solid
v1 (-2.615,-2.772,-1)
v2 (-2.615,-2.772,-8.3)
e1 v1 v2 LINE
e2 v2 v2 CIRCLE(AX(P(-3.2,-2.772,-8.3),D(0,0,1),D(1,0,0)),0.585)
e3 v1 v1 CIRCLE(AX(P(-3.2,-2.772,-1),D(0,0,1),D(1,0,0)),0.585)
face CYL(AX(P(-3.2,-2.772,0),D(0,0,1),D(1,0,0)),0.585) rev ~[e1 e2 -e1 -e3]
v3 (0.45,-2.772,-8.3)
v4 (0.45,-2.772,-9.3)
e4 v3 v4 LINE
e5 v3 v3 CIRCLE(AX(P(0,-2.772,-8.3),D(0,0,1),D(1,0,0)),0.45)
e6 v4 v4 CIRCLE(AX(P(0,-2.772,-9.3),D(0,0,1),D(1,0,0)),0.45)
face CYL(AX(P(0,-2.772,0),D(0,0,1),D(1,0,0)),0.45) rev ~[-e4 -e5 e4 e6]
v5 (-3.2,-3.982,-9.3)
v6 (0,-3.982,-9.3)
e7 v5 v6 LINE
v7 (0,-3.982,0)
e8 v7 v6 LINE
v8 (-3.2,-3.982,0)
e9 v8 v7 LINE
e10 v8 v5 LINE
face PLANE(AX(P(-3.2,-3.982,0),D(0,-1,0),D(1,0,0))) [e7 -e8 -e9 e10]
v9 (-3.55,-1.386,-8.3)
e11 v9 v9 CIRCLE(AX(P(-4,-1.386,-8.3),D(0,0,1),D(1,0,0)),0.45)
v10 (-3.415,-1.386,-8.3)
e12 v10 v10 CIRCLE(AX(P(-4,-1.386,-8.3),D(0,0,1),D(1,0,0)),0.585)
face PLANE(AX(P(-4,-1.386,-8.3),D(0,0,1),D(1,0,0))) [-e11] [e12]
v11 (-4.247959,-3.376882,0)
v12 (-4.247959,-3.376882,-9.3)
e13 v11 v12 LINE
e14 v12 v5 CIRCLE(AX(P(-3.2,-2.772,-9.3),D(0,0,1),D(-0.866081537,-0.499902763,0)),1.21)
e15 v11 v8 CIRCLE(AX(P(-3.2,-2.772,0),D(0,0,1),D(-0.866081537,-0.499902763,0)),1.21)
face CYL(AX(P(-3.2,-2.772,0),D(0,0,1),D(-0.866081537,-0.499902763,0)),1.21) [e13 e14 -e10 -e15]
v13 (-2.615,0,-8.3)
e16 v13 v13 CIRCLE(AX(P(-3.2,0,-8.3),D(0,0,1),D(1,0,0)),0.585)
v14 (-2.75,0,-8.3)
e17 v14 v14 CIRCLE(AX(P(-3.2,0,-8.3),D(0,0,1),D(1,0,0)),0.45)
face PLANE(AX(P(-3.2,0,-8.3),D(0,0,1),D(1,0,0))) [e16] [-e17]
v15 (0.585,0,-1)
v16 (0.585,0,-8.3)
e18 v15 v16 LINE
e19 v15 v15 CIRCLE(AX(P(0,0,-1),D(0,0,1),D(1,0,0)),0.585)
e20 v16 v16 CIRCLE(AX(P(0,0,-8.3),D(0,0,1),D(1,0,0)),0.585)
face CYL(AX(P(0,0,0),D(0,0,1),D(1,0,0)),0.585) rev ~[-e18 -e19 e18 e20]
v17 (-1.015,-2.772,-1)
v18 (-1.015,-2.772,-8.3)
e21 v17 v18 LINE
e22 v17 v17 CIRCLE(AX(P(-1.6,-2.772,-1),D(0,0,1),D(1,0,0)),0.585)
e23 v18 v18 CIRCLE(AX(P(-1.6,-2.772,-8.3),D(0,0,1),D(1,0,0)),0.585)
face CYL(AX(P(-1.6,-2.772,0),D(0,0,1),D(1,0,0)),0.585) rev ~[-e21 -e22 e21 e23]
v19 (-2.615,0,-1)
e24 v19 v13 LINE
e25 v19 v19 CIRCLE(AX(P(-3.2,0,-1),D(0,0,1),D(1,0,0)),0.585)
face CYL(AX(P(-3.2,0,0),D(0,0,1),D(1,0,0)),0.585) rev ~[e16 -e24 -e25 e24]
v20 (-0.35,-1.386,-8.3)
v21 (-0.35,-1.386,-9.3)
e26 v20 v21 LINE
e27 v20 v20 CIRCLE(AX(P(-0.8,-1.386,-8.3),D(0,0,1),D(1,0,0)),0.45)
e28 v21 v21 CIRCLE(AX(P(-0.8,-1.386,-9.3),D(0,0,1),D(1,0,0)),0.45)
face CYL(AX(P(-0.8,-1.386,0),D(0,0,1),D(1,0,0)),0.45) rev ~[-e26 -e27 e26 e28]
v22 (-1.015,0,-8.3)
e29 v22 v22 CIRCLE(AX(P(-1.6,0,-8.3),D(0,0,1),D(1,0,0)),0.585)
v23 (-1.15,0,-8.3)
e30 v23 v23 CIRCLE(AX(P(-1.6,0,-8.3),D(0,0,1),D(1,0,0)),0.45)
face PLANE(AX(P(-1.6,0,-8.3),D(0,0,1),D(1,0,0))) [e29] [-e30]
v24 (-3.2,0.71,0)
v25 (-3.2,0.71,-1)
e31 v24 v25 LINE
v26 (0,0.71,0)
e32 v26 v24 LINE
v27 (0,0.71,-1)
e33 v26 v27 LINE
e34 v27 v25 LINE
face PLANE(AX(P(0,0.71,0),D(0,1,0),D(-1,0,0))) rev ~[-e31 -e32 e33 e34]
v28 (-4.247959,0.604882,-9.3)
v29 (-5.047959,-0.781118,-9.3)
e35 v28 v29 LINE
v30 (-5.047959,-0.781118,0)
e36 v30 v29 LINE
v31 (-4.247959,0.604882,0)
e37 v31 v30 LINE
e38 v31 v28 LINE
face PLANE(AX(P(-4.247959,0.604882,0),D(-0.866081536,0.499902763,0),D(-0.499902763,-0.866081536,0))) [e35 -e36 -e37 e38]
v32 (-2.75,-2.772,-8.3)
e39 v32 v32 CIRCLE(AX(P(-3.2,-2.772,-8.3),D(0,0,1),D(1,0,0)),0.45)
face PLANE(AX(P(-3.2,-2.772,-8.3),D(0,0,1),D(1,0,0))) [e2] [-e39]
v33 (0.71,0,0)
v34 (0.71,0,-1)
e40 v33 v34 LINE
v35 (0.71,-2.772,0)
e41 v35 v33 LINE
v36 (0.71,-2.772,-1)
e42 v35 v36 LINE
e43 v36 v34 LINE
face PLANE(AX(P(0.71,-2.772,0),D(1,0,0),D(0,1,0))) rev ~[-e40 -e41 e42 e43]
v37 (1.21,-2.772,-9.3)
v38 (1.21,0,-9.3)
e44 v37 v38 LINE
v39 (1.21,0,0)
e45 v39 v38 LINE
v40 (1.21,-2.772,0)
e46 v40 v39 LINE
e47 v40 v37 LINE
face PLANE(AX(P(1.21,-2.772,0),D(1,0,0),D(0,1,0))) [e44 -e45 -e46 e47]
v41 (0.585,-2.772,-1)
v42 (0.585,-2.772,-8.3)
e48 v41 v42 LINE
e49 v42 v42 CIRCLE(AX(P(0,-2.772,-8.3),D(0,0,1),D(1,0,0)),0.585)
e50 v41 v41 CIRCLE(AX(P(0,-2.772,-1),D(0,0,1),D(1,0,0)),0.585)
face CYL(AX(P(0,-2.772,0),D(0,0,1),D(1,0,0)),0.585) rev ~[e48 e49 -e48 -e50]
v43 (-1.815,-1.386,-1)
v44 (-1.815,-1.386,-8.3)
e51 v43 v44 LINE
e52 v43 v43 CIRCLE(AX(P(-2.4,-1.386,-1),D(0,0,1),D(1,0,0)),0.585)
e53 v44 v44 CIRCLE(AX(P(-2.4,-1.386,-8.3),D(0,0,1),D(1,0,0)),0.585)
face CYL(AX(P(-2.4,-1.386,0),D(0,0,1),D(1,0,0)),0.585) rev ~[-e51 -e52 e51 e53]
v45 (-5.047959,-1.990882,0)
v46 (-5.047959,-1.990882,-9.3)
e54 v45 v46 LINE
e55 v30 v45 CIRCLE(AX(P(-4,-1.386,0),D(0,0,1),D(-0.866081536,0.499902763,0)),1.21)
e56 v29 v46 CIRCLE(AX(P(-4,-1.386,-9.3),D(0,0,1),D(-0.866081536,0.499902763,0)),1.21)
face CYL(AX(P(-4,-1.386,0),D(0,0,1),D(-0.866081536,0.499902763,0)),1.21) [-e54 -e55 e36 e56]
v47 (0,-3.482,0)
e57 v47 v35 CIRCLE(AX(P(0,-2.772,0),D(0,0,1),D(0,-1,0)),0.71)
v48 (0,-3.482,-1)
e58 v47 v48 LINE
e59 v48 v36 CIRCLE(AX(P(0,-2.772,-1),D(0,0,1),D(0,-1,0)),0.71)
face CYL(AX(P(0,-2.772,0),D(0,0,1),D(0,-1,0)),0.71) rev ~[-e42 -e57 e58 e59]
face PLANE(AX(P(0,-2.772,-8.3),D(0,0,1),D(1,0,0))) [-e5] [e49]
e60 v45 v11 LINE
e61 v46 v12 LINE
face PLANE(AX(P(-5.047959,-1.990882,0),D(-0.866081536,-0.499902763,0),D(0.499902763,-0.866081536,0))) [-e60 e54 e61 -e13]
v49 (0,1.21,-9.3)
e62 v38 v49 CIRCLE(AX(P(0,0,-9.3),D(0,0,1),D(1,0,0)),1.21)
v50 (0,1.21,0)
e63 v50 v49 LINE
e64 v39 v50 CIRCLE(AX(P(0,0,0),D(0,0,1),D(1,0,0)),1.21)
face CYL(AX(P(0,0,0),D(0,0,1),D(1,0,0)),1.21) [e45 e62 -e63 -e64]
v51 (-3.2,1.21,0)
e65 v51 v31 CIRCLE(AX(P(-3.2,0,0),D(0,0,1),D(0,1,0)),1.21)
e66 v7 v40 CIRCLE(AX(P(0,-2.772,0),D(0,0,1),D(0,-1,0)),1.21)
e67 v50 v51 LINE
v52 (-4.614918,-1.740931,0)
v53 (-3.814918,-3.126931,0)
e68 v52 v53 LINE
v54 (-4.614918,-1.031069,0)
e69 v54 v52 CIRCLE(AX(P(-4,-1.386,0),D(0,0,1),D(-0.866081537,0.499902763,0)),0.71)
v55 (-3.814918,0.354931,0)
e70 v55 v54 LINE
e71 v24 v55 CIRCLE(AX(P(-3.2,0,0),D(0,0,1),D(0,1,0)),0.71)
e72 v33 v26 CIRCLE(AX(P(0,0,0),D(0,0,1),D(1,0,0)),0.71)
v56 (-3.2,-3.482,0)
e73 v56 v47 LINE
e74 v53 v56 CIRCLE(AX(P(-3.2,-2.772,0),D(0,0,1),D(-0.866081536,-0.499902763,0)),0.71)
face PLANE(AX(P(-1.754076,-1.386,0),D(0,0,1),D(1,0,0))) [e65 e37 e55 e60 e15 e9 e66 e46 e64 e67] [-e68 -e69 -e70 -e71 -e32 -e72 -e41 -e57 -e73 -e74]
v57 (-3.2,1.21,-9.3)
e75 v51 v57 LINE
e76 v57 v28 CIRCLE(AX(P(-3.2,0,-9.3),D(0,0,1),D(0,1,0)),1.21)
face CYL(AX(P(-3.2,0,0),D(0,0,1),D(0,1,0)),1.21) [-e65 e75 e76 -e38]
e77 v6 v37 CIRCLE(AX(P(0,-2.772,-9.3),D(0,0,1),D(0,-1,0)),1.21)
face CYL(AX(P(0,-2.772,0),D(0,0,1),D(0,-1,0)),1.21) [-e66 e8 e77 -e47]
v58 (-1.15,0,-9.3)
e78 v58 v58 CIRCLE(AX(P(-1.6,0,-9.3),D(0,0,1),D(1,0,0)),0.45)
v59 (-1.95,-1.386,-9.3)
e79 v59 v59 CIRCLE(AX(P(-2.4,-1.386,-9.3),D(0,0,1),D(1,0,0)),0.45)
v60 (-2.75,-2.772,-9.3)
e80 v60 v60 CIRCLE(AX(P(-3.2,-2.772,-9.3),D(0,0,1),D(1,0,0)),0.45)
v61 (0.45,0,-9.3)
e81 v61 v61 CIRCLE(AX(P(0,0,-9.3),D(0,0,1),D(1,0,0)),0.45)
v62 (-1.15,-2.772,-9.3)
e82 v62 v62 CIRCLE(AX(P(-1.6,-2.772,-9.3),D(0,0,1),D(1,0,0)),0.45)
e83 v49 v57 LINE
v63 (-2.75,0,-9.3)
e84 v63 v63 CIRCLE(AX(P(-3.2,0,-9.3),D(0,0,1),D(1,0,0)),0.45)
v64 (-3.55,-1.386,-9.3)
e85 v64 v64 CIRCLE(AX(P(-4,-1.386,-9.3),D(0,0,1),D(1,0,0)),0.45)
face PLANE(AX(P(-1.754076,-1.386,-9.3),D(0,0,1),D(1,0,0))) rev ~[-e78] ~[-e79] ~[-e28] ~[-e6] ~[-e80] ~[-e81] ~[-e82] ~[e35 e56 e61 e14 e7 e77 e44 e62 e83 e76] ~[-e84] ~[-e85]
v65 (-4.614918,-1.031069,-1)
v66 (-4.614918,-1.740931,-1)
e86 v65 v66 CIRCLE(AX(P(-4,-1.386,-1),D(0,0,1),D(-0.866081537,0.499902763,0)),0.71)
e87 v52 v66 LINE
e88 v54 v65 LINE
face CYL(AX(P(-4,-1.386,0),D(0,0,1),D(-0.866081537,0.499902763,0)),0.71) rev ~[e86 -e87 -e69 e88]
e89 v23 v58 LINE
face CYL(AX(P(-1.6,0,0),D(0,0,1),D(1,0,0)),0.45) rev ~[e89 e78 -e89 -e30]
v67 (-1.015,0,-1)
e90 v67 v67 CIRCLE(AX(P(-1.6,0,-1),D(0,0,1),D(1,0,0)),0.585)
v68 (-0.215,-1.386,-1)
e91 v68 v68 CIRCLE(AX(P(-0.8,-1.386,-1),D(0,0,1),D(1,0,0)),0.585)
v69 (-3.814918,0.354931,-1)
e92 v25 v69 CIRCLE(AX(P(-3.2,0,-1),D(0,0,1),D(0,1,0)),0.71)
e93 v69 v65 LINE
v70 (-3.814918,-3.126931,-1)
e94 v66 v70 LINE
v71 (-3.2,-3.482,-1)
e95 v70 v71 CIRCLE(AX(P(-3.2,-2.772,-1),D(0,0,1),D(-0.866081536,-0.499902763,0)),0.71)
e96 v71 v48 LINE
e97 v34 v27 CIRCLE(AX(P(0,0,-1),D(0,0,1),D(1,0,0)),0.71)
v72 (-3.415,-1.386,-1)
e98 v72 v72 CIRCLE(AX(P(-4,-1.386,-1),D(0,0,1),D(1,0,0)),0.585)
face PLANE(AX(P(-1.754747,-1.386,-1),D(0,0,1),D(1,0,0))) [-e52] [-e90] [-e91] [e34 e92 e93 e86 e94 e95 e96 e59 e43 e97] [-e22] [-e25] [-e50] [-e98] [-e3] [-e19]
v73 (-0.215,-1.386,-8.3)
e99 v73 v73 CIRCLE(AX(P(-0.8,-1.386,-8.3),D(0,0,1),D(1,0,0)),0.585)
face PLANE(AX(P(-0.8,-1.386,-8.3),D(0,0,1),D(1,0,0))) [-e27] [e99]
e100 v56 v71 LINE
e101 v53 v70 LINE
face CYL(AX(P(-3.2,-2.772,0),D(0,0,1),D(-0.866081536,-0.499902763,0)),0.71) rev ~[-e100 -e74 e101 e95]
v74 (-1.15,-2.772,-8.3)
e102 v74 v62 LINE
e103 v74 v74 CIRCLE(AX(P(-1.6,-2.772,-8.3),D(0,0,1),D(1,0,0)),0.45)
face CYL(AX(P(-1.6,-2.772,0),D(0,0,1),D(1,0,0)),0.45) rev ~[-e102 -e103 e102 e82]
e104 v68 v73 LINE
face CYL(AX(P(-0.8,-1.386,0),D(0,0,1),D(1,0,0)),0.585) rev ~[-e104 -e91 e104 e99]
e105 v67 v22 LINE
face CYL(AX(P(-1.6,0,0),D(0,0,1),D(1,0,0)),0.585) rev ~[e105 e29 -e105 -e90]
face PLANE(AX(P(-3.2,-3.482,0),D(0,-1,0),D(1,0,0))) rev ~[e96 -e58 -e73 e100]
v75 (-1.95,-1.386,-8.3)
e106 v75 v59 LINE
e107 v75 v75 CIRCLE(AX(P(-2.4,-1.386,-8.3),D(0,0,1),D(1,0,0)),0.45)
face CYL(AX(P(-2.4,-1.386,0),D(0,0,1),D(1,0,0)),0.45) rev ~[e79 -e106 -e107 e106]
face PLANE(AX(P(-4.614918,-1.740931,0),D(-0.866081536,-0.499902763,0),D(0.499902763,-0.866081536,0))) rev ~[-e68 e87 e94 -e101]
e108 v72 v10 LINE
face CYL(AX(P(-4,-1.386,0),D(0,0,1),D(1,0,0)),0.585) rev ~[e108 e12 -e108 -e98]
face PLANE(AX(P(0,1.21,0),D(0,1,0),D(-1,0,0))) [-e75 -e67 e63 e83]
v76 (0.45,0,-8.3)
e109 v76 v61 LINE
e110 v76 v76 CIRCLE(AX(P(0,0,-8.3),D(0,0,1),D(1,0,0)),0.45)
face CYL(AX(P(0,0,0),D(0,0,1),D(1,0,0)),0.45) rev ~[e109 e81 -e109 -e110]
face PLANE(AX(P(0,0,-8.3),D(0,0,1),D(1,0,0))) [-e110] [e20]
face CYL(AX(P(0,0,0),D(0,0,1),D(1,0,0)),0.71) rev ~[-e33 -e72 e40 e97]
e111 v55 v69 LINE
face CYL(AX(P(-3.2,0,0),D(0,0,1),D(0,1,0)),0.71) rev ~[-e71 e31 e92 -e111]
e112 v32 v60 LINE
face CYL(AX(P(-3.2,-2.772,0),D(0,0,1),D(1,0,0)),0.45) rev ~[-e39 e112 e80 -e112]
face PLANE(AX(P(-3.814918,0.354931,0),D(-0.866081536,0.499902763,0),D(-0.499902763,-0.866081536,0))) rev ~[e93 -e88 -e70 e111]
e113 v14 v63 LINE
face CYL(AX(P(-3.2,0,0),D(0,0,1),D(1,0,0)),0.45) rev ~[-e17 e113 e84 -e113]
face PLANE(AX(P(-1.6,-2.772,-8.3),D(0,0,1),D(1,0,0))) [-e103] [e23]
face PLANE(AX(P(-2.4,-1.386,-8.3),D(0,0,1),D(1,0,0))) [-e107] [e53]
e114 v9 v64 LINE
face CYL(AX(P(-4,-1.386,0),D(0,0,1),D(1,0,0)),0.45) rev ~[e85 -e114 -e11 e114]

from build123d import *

# Parameters (mm, degrees)
F0_R     = 0.585
F1_DEPTH = 9.3
F2_DEPTH = 1
F3_DEPTH = 8.3
F4_R     = 0.45
F5_DEPTH = 9.301


# Not quite as in the source:
# - a feature names something its author has since deleted; it is built from what else it names


with BuildPart() as f1:
    # F0 (on Top) → F1 (new body)
    with BuildSketch(Plane.XY):
        with BuildLine():
            Line((0, 1.21), (-3.2, 1.21))
            ThreePointArc((-3.2, 1.21), (-3.8050588257, 1.0478567734), (-4.2479586591, 0.6048823429))
            Line((-4.2479586591, 0.6048823429), (-5.0479586591, -0.7811176571))
            ThreePointArc((-5.0479586591, -0.7811176571), (-5.21, -1.386), (-5.0479586591, -1.9908823429))
            Line((-5.0479586591, -1.9908823429), (-4.2479586591, -3.3768823429))
            ThreePointArc((-4.2479586591, -3.3768823429), (-3.8050588257, -3.8198567734), (-3.2, -3.982))
            Line((-3.2, -3.982), (0, -3.982))
            ThreePointArc((0, -3.982), (0.8555992052, -3.6275992052), (1.21, -2.772))
            Line((1.21, -2.772), (1.21, 0))
            ThreePointArc((1.21, 0), (0.8555992052, 0.8555992052), (0, 1.21))
        make_face()
        with BuildLine():
            ThreePointArc((-3.8149178909, 0.3549309616), (-3.5550345175, 0.6148581067), (-3.2, 0.71))
            Line((-3.2, 0.71), (0, 0.71))
            ThreePointArc((0, 0.71), (0.5020458146, 0.5020458146), (0.71, 0))
            Line((0.71, 0), (0.71, -2.772))
            ThreePointArc((0.71, -2.772), (0.5020458146, -3.2740458146), (0, -3.482))
            Line((0, -3.482), (-3.2, -3.482))
            ThreePointArc((-3.2, -3.482), (-3.5550345175, -3.3868581067), (-3.8149178909, -3.1269309616))
            Line((-3.8149178909, -3.1269309616), (-4.6149178909, -1.7409309616))
            ThreePointArc((-4.6149178909, -1.7409309616), (-4.71, -1.386), (-4.6149178909, -1.0310690384))
            Line((-4.6149178909, -1.0310690384), (-3.8149178909, 0.3549309616))
        make_face(mode=Mode.SUBTRACT)
        with BuildLine():
            Line((0, 0.71), (-3.2, 0.71))
            ThreePointArc((-3.2, 0.71), (-3.5550345175, 0.6148581067), (-3.8149178909, 0.3549309616))
            Line((-3.8149178909, 0.3549309616), (-4.6149178909, -1.0310690384))
            ThreePointArc((-4.6149178909, -1.0310690384), (-4.71, -1.386), (-4.6149178909, -1.7409309616))
            Line((-4.6149178909, -1.7409309616), (-3.8149178909, -3.1269309616))
            ThreePointArc((-3.8149178909, -3.1269309616), (-3.5550345175, -3.3868581067), (-3.2, -3.482))
            Line((-3.2, -3.482), (0, -3.482))
            ThreePointArc((0, -3.482), (0.5020458146, -3.2740458146), (0.71, -2.772))
            Line((0.71, -2.772), (0.71, 0))
            ThreePointArc((0.71, 0), (0.5020458146, 0.5020458146), (0, 0.71))
        make_face()
        with Locations((-3.2, -2.772)):
            Circle(F0_R, mode=Mode.SUBTRACT)
        with Locations((-4, -1.386)):
            Circle(F0_R, mode=Mode.SUBTRACT)
        with Locations((-2.4, -1.386)):
            Circle(F0_R, mode=Mode.SUBTRACT)
        with Locations((-1.6, -2.772)):
            Circle(F0_R, mode=Mode.SUBTRACT)
        with Locations((0, -2.772)):
            Circle(F0_R, mode=Mode.SUBTRACT)
        with Locations((-0.8, -1.386)):
            Circle(F0_R, mode=Mode.SUBTRACT)
        with Locations((-3.2, 0)):
            Circle(F0_R, mode=Mode.SUBTRACT)
        with Locations((-1.6, 0)):
            Circle(F0_R, mode=Mode.SUBTRACT)
        Circle(F0_R, mode=Mode.SUBTRACT)
        with Locations((-4, -1.386)):
            Circle(F0_R)
        with Locations((-3.2, 0)):
            Circle(F0_R)
        with Locations((-1.6, 0)):
            Circle(F0_R)
        with Locations((-2.4, -1.386)):
            Circle(F0_R)
        with Locations((-3.2, -2.772)):
            Circle(F0_R)
        with Locations((-1.6, -2.772)):
            Circle(F0_R)
        with Locations((-0.8, -1.386)):
            Circle(F0_R)
        Circle(F0_R)
        with Locations((0, -2.772)):
            Circle(F0_R)
    extrude(amount=-F1_DEPTH)

    # F0 (on Top) → F2 (cut)
    with BuildSketch(Plane.XY):
        with BuildLine():
            Line((0, 0.71), (-3.2, 0.71))
            ThreePointArc((-3.2, 0.71), (-3.5550345175, 0.6148581067), (-3.8149178909, 0.3549309616))
            Line((-3.8149178909, 0.3549309616), (-4.6149178909, -1.0310690384))
            ThreePointArc((-4.6149178909, -1.0310690384), (-4.71, -1.386), (-4.6149178909, -1.7409309616))
            Line((-4.6149178909, -1.7409309616), (-3.8149178909, -3.1269309616))
            ThreePointArc((-3.8149178909, -3.1269309616), (-3.5550345175, -3.3868581067), (-3.2, -3.482))
            Line((-3.2, -3.482), (0, -3.482))
            ThreePointArc((0, -3.482), (0.5020458146, -3.2740458146), (0.71, -2.772))
            Line((0.71, -2.772), (0.71, 0))
            ThreePointArc((0.71, 0), (0.5020458146, 0.5020458146), (0, 0.71))
        make_face()
        with Locations((-3.2, -2.772)):
            Circle(F0_R, mode=Mode.SUBTRACT)
        with Locations((-4, -1.386)):
            Circle(F0_R, mode=Mode.SUBTRACT)
        with Locations((-2.4, -1.386)):
            Circle(F0_R, mode=Mode.SUBTRACT)
        with Locations((-1.6, -2.772)):
            Circle(F0_R, mode=Mode.SUBTRACT)
        with Locations((0, -2.772)):
            Circle(F0_R, mode=Mode.SUBTRACT)
        with Locations((-0.8, -1.386)):
            Circle(F0_R, mode=Mode.SUBTRACT)
        with Locations((-3.2, 0)):
            Circle(F0_R, mode=Mode.SUBTRACT)
        with Locations((-1.6, 0)):
            Circle(F0_R, mode=Mode.SUBTRACT)
        Circle(F0_R, mode=Mode.SUBTRACT)
        Circle(F0_R)
        with Locations((-0.8, -1.386)):
            Circle(F0_R)
        with Locations((0, -2.772)):
            Circle(F0_R)
        with Locations((-4, -1.386)):
            Circle(F0_R)
        with Locations((-2.4, -1.386)):
            Circle(F0_R)
        with Locations((-3.2, 0)):
            Circle(F0_R)
        with Locations((-1.6, 0)):
            Circle(F0_R)
        with Locations((-1.6, -2.772)):
            Circle(F0_R)
        with Locations((-3.2, -2.772)):
            Circle(F0_R)
    extrude(amount=-F2_DEPTH, mode=Mode.SUBTRACT)

    # F0 (on Top) → F3 (cut)
    with BuildSketch(Plane.XY):
        with Locations((-0.8, -1.386)):
            Circle(F0_R)
        Circle(F0_R)
        with Locations((0, -2.772)):
            Circle(F0_R)
        with Locations((-1.6, -2.772)):
            Circle(F0_R)
        with Locations((-3.2, -2.772)):
            Circle(F0_R)
        with Locations((-2.4, -1.386)):
            Circle(F0_R)
        with Locations((-1.6, 0)):
            Circle(F0_R)
        with Locations((-3.2, 0)):
            Circle(F0_R)
        with Locations((-4, -1.386)):
            Circle(F0_R)
    extrude(amount=-F3_DEPTH, mode=Mode.SUBTRACT)

    # F4 (on Top) → F5 (cut, through all)
    with BuildSketch(Plane.XY):
        with Locations((-3.2, 0)):
            Circle(F4_R)
        with Locations((-1.6, 0)):
            Circle(F4_R)
        Circle(F4_R)
        with Locations((-0.8, -1.386)):
            Circle(F4_R)
        with Locations((-2.4, -1.386)):
            Circle(F4_R)
        with Locations((-4, -1.386)):
            Circle(F4_R)
        with Locations((-3.2, -2.772)):
            Circle(F4_R)
        with Locations((-1.6, -2.772)):
            Circle(F4_R)
        with Locations((0, -2.772)):
            Circle(F4_R)
    extrude(amount=-F5_DEPTH, mode=Mode.SUBTRACT)


solid = f1.part
